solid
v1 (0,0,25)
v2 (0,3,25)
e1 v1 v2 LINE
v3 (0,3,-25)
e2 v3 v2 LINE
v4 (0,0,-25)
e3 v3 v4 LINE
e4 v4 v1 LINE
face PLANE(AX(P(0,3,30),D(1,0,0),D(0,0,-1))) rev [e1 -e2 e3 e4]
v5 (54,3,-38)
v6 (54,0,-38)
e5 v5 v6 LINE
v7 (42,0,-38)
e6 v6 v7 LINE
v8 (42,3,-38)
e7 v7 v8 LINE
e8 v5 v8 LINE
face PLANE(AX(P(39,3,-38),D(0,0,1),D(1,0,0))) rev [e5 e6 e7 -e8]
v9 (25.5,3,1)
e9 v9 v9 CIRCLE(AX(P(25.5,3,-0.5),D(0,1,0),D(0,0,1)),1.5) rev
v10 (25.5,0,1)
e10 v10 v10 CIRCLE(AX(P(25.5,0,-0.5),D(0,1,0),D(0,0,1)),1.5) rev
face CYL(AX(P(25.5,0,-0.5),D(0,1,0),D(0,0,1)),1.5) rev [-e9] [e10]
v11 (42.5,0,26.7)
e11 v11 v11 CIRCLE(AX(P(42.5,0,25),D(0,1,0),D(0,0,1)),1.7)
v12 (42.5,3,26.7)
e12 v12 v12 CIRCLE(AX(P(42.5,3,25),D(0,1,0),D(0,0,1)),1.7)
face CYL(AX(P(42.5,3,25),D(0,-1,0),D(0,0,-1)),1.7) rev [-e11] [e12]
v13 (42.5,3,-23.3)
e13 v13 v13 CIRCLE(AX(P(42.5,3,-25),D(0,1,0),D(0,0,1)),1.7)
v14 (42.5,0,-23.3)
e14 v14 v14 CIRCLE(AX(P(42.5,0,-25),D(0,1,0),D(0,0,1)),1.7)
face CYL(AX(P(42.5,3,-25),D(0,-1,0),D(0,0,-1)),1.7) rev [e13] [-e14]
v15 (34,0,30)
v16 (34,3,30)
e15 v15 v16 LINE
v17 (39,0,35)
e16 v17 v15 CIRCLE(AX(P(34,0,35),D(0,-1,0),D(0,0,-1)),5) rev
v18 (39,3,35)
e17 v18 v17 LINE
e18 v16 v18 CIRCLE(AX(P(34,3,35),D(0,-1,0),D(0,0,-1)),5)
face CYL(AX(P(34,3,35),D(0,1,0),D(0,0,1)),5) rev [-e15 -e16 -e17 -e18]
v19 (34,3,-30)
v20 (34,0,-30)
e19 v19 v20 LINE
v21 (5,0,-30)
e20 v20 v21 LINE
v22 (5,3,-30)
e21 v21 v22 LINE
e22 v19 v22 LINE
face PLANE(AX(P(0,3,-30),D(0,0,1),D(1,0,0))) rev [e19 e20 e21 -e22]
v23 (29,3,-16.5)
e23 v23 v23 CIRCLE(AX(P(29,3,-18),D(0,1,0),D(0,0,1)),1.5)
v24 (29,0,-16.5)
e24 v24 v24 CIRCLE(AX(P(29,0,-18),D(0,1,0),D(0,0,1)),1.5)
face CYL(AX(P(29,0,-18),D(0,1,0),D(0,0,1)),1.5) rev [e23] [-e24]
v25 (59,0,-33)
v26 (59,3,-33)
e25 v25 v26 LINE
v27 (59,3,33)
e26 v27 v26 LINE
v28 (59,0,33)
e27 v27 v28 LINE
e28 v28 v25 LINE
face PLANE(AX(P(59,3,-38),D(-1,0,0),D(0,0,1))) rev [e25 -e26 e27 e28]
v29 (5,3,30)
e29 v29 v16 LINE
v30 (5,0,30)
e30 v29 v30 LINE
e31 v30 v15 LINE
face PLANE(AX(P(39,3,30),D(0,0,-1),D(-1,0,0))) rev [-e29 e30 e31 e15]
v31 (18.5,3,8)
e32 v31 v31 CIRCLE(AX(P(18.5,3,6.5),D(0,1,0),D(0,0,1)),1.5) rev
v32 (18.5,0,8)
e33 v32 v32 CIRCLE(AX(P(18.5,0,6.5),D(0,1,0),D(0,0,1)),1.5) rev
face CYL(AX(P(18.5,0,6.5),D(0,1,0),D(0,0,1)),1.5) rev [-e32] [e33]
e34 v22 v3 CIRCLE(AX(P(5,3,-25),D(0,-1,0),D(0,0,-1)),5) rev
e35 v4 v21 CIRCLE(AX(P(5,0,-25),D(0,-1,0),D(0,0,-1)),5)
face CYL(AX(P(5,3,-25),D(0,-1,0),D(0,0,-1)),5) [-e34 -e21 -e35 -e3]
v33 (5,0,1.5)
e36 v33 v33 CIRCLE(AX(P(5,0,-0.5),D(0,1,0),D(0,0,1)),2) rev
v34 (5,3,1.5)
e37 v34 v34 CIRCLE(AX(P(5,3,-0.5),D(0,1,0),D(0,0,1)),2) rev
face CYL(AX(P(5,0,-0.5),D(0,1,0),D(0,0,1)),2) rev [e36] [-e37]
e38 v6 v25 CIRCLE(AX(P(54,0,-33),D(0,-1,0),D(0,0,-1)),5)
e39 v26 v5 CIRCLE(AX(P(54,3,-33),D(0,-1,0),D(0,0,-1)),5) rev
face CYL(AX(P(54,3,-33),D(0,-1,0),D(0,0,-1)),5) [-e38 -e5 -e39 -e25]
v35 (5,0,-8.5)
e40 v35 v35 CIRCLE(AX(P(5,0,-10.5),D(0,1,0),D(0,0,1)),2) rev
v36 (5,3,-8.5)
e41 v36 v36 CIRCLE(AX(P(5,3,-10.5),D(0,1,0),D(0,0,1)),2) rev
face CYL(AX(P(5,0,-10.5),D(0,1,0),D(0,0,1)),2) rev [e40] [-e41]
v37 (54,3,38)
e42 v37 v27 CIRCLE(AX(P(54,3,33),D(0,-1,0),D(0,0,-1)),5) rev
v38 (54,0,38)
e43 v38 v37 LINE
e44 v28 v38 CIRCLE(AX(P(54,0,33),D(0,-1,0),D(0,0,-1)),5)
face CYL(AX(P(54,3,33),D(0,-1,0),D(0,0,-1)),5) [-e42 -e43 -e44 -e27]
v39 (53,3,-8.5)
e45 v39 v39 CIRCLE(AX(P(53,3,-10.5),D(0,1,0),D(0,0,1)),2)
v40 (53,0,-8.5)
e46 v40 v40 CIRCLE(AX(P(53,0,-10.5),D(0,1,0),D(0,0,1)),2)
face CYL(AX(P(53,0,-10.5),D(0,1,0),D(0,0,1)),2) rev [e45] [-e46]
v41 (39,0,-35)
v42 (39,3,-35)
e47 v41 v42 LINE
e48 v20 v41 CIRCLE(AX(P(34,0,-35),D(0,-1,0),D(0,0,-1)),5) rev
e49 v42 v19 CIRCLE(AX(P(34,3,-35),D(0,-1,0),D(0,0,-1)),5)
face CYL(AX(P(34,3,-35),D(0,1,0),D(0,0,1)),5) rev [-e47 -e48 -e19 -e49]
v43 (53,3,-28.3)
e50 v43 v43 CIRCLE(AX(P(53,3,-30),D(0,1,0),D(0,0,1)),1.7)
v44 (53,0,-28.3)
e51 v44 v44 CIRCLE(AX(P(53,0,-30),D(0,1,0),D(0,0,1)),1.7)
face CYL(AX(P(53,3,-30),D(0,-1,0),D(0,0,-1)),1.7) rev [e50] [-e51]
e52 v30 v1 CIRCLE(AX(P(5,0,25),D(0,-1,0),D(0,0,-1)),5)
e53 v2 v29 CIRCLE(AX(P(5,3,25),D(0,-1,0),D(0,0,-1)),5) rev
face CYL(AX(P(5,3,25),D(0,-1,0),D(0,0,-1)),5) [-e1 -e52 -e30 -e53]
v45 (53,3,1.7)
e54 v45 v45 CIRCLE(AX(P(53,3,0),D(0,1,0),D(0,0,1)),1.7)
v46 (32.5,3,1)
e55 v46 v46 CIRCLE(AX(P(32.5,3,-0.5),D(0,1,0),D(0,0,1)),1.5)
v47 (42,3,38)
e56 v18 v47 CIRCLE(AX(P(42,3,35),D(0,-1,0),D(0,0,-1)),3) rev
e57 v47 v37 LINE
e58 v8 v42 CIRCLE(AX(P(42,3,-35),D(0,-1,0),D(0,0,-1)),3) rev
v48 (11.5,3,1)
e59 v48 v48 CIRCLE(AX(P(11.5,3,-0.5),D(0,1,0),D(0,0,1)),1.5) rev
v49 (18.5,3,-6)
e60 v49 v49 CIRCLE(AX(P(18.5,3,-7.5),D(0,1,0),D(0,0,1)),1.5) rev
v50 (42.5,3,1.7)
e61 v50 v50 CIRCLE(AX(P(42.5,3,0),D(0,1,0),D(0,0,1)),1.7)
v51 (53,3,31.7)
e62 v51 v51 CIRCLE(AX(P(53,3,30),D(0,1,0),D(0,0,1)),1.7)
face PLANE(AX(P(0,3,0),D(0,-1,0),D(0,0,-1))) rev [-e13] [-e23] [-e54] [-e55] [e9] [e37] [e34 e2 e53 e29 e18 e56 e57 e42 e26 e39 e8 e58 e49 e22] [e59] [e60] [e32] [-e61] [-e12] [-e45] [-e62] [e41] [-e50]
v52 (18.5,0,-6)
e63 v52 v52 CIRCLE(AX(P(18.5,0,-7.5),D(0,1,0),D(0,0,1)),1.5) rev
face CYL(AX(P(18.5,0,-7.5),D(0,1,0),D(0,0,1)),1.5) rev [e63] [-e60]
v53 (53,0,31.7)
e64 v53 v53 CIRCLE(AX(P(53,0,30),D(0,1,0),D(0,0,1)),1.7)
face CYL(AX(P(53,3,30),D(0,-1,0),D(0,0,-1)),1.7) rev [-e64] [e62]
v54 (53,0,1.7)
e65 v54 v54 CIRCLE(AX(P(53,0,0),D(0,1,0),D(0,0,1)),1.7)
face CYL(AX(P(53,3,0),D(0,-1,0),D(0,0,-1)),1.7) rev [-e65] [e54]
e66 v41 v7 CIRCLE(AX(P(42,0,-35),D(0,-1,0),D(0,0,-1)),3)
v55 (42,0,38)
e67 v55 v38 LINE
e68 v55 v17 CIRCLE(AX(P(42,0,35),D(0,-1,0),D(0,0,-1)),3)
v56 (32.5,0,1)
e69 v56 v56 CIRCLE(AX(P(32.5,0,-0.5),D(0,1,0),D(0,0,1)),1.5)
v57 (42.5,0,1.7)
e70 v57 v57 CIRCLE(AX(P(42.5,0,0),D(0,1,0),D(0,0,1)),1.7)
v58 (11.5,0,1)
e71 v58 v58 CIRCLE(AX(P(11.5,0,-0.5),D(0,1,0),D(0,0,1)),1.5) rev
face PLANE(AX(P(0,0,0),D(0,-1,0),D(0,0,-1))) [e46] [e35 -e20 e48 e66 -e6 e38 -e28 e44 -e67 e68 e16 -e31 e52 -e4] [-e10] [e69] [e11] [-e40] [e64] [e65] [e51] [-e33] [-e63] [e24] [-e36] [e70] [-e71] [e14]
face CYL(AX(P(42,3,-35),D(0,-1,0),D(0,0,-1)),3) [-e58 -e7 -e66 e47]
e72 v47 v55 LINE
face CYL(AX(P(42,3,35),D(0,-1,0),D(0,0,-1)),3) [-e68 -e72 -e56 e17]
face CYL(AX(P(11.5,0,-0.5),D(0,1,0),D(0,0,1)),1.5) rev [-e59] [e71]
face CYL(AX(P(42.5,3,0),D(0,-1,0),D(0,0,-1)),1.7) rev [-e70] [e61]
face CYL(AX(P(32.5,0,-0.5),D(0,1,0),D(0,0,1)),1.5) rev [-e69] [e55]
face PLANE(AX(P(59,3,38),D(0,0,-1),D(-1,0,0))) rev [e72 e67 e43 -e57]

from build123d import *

# Parameters (mm, degrees)
SKETCH_1_R          = 1.7
EXTRUDE_1_DEPTH     = 3
SKETCH_2_R          = 1.5
SKETCH_2_R_2        = 2
CUT_EXTRUDE_1_DEPTH = 71.242437315
FILLET_1_R          = 5
FILLET_2_R          = 3


with BuildPart() as part:
    # 草图1 → 凸台-拉伸1 (new body)
    with BuildSketch(Plane(origin=(0, 0, 0), x_dir=(1, 0, 0), z_dir=(0, 1, 0))):
        Polygon((0, 0), (0, 30), (39, 30), (39, 38), (59, 38), (59, -38), (39, -38), (39, -30), (0, -30), align=None)
        with Locations(Location((42.5, 25, 0), (0, 0, 270))):
            Circle(SKETCH_1_R, mode=Mode.SUBTRACT)
        with Locations(Location((42.5, -25, 0), (0, 0, 270))):
            Circle(SKETCH_1_R, mode=Mode.SUBTRACT)
        with Locations(Location((42.5, 0, 0), (0, 0, 270))):
            Circle(SKETCH_1_R, mode=Mode.SUBTRACT)
        with Locations(Location((53, 30, 0), (0, 0, 270))):
            Circle(SKETCH_1_R, mode=Mode.SUBTRACT)
        with Locations(Location((53, 0, 0), (0, 0, 270))):
            Circle(SKETCH_1_R, mode=Mode.SUBTRACT)
        with Locations(Location((53, -30, 0), (0, 0, 270))):
            Circle(SKETCH_1_R, mode=Mode.SUBTRACT)
    extrude(amount=EXTRUDE_1_DEPTH)

    # 草图2 → 切除-拉伸1 (cut, through all)
    with BuildSketch(Plane(origin=(0, 3, 0), x_dir=(1, 0, 0), z_dir=(0, 1, 0))):
        with Locations(Location((32.5, 0.5, 0), (0, 0, 270))):
            Circle(SKETCH_2_R)
        with Locations(Location((5, 0.5, 0), (0, 0, 270))):
            Circle(SKETCH_2_R_2)
        with Locations(Location((5, 10.5, 0), (0, 0, 270))):
            Circle(SKETCH_2_R_2)
        with Locations(Location((53, 10.5, 0), (0, 0, 270))):
            Circle(SKETCH_2_R_2)
        with Locations(Location((29, 18, 0), (0, 0, 270))):
            Circle(SKETCH_2_R)
        with Locations(Location((18.5, -6.5, 0), (0, 0, 270))):
            Circle(SKETCH_2_R)
        with Locations(Location((11.5, 0.5, 0), (0, 0, 270))):
            Circle(SKETCH_2_R)
        with Locations(Location((25.5, 0.5, 0), (0, 0, 270))):
            Circle(SKETCH_2_R)
        with Locations(Location((18.5, 7.5, 0), (0, 0, 270))):
            Circle(SKETCH_2_R)
    extrude(amount=-CUT_EXTRUDE_1_DEPTH, mode=Mode.SUBTRACT)

    # 圆角1
    fillet_1_edges = [part.edges().sort_by_distance(p)[0] for p in [
        (59, 1.5, 38),
        (39, 1.5, 30),
        (0, 1.5, 30),
        (0, 1.5, -30),
        (39, 1.5, -30),
        (59, 1.5, -38),
    ]]
    fillet(fillet_1_edges, radius=FILLET_1_R)

    # 圆角2
    fillet_2_edges = [part.edges().sort_by_distance(p)[0] for p in [
        (39, 1.5, 38),
        (39, 1.5, -38),
    ]]
    fillet(fillet_2_edges, radius=FILLET_2_R - 0.0001)  # a hair under: the kernel refuses the full size


solid = part.part
